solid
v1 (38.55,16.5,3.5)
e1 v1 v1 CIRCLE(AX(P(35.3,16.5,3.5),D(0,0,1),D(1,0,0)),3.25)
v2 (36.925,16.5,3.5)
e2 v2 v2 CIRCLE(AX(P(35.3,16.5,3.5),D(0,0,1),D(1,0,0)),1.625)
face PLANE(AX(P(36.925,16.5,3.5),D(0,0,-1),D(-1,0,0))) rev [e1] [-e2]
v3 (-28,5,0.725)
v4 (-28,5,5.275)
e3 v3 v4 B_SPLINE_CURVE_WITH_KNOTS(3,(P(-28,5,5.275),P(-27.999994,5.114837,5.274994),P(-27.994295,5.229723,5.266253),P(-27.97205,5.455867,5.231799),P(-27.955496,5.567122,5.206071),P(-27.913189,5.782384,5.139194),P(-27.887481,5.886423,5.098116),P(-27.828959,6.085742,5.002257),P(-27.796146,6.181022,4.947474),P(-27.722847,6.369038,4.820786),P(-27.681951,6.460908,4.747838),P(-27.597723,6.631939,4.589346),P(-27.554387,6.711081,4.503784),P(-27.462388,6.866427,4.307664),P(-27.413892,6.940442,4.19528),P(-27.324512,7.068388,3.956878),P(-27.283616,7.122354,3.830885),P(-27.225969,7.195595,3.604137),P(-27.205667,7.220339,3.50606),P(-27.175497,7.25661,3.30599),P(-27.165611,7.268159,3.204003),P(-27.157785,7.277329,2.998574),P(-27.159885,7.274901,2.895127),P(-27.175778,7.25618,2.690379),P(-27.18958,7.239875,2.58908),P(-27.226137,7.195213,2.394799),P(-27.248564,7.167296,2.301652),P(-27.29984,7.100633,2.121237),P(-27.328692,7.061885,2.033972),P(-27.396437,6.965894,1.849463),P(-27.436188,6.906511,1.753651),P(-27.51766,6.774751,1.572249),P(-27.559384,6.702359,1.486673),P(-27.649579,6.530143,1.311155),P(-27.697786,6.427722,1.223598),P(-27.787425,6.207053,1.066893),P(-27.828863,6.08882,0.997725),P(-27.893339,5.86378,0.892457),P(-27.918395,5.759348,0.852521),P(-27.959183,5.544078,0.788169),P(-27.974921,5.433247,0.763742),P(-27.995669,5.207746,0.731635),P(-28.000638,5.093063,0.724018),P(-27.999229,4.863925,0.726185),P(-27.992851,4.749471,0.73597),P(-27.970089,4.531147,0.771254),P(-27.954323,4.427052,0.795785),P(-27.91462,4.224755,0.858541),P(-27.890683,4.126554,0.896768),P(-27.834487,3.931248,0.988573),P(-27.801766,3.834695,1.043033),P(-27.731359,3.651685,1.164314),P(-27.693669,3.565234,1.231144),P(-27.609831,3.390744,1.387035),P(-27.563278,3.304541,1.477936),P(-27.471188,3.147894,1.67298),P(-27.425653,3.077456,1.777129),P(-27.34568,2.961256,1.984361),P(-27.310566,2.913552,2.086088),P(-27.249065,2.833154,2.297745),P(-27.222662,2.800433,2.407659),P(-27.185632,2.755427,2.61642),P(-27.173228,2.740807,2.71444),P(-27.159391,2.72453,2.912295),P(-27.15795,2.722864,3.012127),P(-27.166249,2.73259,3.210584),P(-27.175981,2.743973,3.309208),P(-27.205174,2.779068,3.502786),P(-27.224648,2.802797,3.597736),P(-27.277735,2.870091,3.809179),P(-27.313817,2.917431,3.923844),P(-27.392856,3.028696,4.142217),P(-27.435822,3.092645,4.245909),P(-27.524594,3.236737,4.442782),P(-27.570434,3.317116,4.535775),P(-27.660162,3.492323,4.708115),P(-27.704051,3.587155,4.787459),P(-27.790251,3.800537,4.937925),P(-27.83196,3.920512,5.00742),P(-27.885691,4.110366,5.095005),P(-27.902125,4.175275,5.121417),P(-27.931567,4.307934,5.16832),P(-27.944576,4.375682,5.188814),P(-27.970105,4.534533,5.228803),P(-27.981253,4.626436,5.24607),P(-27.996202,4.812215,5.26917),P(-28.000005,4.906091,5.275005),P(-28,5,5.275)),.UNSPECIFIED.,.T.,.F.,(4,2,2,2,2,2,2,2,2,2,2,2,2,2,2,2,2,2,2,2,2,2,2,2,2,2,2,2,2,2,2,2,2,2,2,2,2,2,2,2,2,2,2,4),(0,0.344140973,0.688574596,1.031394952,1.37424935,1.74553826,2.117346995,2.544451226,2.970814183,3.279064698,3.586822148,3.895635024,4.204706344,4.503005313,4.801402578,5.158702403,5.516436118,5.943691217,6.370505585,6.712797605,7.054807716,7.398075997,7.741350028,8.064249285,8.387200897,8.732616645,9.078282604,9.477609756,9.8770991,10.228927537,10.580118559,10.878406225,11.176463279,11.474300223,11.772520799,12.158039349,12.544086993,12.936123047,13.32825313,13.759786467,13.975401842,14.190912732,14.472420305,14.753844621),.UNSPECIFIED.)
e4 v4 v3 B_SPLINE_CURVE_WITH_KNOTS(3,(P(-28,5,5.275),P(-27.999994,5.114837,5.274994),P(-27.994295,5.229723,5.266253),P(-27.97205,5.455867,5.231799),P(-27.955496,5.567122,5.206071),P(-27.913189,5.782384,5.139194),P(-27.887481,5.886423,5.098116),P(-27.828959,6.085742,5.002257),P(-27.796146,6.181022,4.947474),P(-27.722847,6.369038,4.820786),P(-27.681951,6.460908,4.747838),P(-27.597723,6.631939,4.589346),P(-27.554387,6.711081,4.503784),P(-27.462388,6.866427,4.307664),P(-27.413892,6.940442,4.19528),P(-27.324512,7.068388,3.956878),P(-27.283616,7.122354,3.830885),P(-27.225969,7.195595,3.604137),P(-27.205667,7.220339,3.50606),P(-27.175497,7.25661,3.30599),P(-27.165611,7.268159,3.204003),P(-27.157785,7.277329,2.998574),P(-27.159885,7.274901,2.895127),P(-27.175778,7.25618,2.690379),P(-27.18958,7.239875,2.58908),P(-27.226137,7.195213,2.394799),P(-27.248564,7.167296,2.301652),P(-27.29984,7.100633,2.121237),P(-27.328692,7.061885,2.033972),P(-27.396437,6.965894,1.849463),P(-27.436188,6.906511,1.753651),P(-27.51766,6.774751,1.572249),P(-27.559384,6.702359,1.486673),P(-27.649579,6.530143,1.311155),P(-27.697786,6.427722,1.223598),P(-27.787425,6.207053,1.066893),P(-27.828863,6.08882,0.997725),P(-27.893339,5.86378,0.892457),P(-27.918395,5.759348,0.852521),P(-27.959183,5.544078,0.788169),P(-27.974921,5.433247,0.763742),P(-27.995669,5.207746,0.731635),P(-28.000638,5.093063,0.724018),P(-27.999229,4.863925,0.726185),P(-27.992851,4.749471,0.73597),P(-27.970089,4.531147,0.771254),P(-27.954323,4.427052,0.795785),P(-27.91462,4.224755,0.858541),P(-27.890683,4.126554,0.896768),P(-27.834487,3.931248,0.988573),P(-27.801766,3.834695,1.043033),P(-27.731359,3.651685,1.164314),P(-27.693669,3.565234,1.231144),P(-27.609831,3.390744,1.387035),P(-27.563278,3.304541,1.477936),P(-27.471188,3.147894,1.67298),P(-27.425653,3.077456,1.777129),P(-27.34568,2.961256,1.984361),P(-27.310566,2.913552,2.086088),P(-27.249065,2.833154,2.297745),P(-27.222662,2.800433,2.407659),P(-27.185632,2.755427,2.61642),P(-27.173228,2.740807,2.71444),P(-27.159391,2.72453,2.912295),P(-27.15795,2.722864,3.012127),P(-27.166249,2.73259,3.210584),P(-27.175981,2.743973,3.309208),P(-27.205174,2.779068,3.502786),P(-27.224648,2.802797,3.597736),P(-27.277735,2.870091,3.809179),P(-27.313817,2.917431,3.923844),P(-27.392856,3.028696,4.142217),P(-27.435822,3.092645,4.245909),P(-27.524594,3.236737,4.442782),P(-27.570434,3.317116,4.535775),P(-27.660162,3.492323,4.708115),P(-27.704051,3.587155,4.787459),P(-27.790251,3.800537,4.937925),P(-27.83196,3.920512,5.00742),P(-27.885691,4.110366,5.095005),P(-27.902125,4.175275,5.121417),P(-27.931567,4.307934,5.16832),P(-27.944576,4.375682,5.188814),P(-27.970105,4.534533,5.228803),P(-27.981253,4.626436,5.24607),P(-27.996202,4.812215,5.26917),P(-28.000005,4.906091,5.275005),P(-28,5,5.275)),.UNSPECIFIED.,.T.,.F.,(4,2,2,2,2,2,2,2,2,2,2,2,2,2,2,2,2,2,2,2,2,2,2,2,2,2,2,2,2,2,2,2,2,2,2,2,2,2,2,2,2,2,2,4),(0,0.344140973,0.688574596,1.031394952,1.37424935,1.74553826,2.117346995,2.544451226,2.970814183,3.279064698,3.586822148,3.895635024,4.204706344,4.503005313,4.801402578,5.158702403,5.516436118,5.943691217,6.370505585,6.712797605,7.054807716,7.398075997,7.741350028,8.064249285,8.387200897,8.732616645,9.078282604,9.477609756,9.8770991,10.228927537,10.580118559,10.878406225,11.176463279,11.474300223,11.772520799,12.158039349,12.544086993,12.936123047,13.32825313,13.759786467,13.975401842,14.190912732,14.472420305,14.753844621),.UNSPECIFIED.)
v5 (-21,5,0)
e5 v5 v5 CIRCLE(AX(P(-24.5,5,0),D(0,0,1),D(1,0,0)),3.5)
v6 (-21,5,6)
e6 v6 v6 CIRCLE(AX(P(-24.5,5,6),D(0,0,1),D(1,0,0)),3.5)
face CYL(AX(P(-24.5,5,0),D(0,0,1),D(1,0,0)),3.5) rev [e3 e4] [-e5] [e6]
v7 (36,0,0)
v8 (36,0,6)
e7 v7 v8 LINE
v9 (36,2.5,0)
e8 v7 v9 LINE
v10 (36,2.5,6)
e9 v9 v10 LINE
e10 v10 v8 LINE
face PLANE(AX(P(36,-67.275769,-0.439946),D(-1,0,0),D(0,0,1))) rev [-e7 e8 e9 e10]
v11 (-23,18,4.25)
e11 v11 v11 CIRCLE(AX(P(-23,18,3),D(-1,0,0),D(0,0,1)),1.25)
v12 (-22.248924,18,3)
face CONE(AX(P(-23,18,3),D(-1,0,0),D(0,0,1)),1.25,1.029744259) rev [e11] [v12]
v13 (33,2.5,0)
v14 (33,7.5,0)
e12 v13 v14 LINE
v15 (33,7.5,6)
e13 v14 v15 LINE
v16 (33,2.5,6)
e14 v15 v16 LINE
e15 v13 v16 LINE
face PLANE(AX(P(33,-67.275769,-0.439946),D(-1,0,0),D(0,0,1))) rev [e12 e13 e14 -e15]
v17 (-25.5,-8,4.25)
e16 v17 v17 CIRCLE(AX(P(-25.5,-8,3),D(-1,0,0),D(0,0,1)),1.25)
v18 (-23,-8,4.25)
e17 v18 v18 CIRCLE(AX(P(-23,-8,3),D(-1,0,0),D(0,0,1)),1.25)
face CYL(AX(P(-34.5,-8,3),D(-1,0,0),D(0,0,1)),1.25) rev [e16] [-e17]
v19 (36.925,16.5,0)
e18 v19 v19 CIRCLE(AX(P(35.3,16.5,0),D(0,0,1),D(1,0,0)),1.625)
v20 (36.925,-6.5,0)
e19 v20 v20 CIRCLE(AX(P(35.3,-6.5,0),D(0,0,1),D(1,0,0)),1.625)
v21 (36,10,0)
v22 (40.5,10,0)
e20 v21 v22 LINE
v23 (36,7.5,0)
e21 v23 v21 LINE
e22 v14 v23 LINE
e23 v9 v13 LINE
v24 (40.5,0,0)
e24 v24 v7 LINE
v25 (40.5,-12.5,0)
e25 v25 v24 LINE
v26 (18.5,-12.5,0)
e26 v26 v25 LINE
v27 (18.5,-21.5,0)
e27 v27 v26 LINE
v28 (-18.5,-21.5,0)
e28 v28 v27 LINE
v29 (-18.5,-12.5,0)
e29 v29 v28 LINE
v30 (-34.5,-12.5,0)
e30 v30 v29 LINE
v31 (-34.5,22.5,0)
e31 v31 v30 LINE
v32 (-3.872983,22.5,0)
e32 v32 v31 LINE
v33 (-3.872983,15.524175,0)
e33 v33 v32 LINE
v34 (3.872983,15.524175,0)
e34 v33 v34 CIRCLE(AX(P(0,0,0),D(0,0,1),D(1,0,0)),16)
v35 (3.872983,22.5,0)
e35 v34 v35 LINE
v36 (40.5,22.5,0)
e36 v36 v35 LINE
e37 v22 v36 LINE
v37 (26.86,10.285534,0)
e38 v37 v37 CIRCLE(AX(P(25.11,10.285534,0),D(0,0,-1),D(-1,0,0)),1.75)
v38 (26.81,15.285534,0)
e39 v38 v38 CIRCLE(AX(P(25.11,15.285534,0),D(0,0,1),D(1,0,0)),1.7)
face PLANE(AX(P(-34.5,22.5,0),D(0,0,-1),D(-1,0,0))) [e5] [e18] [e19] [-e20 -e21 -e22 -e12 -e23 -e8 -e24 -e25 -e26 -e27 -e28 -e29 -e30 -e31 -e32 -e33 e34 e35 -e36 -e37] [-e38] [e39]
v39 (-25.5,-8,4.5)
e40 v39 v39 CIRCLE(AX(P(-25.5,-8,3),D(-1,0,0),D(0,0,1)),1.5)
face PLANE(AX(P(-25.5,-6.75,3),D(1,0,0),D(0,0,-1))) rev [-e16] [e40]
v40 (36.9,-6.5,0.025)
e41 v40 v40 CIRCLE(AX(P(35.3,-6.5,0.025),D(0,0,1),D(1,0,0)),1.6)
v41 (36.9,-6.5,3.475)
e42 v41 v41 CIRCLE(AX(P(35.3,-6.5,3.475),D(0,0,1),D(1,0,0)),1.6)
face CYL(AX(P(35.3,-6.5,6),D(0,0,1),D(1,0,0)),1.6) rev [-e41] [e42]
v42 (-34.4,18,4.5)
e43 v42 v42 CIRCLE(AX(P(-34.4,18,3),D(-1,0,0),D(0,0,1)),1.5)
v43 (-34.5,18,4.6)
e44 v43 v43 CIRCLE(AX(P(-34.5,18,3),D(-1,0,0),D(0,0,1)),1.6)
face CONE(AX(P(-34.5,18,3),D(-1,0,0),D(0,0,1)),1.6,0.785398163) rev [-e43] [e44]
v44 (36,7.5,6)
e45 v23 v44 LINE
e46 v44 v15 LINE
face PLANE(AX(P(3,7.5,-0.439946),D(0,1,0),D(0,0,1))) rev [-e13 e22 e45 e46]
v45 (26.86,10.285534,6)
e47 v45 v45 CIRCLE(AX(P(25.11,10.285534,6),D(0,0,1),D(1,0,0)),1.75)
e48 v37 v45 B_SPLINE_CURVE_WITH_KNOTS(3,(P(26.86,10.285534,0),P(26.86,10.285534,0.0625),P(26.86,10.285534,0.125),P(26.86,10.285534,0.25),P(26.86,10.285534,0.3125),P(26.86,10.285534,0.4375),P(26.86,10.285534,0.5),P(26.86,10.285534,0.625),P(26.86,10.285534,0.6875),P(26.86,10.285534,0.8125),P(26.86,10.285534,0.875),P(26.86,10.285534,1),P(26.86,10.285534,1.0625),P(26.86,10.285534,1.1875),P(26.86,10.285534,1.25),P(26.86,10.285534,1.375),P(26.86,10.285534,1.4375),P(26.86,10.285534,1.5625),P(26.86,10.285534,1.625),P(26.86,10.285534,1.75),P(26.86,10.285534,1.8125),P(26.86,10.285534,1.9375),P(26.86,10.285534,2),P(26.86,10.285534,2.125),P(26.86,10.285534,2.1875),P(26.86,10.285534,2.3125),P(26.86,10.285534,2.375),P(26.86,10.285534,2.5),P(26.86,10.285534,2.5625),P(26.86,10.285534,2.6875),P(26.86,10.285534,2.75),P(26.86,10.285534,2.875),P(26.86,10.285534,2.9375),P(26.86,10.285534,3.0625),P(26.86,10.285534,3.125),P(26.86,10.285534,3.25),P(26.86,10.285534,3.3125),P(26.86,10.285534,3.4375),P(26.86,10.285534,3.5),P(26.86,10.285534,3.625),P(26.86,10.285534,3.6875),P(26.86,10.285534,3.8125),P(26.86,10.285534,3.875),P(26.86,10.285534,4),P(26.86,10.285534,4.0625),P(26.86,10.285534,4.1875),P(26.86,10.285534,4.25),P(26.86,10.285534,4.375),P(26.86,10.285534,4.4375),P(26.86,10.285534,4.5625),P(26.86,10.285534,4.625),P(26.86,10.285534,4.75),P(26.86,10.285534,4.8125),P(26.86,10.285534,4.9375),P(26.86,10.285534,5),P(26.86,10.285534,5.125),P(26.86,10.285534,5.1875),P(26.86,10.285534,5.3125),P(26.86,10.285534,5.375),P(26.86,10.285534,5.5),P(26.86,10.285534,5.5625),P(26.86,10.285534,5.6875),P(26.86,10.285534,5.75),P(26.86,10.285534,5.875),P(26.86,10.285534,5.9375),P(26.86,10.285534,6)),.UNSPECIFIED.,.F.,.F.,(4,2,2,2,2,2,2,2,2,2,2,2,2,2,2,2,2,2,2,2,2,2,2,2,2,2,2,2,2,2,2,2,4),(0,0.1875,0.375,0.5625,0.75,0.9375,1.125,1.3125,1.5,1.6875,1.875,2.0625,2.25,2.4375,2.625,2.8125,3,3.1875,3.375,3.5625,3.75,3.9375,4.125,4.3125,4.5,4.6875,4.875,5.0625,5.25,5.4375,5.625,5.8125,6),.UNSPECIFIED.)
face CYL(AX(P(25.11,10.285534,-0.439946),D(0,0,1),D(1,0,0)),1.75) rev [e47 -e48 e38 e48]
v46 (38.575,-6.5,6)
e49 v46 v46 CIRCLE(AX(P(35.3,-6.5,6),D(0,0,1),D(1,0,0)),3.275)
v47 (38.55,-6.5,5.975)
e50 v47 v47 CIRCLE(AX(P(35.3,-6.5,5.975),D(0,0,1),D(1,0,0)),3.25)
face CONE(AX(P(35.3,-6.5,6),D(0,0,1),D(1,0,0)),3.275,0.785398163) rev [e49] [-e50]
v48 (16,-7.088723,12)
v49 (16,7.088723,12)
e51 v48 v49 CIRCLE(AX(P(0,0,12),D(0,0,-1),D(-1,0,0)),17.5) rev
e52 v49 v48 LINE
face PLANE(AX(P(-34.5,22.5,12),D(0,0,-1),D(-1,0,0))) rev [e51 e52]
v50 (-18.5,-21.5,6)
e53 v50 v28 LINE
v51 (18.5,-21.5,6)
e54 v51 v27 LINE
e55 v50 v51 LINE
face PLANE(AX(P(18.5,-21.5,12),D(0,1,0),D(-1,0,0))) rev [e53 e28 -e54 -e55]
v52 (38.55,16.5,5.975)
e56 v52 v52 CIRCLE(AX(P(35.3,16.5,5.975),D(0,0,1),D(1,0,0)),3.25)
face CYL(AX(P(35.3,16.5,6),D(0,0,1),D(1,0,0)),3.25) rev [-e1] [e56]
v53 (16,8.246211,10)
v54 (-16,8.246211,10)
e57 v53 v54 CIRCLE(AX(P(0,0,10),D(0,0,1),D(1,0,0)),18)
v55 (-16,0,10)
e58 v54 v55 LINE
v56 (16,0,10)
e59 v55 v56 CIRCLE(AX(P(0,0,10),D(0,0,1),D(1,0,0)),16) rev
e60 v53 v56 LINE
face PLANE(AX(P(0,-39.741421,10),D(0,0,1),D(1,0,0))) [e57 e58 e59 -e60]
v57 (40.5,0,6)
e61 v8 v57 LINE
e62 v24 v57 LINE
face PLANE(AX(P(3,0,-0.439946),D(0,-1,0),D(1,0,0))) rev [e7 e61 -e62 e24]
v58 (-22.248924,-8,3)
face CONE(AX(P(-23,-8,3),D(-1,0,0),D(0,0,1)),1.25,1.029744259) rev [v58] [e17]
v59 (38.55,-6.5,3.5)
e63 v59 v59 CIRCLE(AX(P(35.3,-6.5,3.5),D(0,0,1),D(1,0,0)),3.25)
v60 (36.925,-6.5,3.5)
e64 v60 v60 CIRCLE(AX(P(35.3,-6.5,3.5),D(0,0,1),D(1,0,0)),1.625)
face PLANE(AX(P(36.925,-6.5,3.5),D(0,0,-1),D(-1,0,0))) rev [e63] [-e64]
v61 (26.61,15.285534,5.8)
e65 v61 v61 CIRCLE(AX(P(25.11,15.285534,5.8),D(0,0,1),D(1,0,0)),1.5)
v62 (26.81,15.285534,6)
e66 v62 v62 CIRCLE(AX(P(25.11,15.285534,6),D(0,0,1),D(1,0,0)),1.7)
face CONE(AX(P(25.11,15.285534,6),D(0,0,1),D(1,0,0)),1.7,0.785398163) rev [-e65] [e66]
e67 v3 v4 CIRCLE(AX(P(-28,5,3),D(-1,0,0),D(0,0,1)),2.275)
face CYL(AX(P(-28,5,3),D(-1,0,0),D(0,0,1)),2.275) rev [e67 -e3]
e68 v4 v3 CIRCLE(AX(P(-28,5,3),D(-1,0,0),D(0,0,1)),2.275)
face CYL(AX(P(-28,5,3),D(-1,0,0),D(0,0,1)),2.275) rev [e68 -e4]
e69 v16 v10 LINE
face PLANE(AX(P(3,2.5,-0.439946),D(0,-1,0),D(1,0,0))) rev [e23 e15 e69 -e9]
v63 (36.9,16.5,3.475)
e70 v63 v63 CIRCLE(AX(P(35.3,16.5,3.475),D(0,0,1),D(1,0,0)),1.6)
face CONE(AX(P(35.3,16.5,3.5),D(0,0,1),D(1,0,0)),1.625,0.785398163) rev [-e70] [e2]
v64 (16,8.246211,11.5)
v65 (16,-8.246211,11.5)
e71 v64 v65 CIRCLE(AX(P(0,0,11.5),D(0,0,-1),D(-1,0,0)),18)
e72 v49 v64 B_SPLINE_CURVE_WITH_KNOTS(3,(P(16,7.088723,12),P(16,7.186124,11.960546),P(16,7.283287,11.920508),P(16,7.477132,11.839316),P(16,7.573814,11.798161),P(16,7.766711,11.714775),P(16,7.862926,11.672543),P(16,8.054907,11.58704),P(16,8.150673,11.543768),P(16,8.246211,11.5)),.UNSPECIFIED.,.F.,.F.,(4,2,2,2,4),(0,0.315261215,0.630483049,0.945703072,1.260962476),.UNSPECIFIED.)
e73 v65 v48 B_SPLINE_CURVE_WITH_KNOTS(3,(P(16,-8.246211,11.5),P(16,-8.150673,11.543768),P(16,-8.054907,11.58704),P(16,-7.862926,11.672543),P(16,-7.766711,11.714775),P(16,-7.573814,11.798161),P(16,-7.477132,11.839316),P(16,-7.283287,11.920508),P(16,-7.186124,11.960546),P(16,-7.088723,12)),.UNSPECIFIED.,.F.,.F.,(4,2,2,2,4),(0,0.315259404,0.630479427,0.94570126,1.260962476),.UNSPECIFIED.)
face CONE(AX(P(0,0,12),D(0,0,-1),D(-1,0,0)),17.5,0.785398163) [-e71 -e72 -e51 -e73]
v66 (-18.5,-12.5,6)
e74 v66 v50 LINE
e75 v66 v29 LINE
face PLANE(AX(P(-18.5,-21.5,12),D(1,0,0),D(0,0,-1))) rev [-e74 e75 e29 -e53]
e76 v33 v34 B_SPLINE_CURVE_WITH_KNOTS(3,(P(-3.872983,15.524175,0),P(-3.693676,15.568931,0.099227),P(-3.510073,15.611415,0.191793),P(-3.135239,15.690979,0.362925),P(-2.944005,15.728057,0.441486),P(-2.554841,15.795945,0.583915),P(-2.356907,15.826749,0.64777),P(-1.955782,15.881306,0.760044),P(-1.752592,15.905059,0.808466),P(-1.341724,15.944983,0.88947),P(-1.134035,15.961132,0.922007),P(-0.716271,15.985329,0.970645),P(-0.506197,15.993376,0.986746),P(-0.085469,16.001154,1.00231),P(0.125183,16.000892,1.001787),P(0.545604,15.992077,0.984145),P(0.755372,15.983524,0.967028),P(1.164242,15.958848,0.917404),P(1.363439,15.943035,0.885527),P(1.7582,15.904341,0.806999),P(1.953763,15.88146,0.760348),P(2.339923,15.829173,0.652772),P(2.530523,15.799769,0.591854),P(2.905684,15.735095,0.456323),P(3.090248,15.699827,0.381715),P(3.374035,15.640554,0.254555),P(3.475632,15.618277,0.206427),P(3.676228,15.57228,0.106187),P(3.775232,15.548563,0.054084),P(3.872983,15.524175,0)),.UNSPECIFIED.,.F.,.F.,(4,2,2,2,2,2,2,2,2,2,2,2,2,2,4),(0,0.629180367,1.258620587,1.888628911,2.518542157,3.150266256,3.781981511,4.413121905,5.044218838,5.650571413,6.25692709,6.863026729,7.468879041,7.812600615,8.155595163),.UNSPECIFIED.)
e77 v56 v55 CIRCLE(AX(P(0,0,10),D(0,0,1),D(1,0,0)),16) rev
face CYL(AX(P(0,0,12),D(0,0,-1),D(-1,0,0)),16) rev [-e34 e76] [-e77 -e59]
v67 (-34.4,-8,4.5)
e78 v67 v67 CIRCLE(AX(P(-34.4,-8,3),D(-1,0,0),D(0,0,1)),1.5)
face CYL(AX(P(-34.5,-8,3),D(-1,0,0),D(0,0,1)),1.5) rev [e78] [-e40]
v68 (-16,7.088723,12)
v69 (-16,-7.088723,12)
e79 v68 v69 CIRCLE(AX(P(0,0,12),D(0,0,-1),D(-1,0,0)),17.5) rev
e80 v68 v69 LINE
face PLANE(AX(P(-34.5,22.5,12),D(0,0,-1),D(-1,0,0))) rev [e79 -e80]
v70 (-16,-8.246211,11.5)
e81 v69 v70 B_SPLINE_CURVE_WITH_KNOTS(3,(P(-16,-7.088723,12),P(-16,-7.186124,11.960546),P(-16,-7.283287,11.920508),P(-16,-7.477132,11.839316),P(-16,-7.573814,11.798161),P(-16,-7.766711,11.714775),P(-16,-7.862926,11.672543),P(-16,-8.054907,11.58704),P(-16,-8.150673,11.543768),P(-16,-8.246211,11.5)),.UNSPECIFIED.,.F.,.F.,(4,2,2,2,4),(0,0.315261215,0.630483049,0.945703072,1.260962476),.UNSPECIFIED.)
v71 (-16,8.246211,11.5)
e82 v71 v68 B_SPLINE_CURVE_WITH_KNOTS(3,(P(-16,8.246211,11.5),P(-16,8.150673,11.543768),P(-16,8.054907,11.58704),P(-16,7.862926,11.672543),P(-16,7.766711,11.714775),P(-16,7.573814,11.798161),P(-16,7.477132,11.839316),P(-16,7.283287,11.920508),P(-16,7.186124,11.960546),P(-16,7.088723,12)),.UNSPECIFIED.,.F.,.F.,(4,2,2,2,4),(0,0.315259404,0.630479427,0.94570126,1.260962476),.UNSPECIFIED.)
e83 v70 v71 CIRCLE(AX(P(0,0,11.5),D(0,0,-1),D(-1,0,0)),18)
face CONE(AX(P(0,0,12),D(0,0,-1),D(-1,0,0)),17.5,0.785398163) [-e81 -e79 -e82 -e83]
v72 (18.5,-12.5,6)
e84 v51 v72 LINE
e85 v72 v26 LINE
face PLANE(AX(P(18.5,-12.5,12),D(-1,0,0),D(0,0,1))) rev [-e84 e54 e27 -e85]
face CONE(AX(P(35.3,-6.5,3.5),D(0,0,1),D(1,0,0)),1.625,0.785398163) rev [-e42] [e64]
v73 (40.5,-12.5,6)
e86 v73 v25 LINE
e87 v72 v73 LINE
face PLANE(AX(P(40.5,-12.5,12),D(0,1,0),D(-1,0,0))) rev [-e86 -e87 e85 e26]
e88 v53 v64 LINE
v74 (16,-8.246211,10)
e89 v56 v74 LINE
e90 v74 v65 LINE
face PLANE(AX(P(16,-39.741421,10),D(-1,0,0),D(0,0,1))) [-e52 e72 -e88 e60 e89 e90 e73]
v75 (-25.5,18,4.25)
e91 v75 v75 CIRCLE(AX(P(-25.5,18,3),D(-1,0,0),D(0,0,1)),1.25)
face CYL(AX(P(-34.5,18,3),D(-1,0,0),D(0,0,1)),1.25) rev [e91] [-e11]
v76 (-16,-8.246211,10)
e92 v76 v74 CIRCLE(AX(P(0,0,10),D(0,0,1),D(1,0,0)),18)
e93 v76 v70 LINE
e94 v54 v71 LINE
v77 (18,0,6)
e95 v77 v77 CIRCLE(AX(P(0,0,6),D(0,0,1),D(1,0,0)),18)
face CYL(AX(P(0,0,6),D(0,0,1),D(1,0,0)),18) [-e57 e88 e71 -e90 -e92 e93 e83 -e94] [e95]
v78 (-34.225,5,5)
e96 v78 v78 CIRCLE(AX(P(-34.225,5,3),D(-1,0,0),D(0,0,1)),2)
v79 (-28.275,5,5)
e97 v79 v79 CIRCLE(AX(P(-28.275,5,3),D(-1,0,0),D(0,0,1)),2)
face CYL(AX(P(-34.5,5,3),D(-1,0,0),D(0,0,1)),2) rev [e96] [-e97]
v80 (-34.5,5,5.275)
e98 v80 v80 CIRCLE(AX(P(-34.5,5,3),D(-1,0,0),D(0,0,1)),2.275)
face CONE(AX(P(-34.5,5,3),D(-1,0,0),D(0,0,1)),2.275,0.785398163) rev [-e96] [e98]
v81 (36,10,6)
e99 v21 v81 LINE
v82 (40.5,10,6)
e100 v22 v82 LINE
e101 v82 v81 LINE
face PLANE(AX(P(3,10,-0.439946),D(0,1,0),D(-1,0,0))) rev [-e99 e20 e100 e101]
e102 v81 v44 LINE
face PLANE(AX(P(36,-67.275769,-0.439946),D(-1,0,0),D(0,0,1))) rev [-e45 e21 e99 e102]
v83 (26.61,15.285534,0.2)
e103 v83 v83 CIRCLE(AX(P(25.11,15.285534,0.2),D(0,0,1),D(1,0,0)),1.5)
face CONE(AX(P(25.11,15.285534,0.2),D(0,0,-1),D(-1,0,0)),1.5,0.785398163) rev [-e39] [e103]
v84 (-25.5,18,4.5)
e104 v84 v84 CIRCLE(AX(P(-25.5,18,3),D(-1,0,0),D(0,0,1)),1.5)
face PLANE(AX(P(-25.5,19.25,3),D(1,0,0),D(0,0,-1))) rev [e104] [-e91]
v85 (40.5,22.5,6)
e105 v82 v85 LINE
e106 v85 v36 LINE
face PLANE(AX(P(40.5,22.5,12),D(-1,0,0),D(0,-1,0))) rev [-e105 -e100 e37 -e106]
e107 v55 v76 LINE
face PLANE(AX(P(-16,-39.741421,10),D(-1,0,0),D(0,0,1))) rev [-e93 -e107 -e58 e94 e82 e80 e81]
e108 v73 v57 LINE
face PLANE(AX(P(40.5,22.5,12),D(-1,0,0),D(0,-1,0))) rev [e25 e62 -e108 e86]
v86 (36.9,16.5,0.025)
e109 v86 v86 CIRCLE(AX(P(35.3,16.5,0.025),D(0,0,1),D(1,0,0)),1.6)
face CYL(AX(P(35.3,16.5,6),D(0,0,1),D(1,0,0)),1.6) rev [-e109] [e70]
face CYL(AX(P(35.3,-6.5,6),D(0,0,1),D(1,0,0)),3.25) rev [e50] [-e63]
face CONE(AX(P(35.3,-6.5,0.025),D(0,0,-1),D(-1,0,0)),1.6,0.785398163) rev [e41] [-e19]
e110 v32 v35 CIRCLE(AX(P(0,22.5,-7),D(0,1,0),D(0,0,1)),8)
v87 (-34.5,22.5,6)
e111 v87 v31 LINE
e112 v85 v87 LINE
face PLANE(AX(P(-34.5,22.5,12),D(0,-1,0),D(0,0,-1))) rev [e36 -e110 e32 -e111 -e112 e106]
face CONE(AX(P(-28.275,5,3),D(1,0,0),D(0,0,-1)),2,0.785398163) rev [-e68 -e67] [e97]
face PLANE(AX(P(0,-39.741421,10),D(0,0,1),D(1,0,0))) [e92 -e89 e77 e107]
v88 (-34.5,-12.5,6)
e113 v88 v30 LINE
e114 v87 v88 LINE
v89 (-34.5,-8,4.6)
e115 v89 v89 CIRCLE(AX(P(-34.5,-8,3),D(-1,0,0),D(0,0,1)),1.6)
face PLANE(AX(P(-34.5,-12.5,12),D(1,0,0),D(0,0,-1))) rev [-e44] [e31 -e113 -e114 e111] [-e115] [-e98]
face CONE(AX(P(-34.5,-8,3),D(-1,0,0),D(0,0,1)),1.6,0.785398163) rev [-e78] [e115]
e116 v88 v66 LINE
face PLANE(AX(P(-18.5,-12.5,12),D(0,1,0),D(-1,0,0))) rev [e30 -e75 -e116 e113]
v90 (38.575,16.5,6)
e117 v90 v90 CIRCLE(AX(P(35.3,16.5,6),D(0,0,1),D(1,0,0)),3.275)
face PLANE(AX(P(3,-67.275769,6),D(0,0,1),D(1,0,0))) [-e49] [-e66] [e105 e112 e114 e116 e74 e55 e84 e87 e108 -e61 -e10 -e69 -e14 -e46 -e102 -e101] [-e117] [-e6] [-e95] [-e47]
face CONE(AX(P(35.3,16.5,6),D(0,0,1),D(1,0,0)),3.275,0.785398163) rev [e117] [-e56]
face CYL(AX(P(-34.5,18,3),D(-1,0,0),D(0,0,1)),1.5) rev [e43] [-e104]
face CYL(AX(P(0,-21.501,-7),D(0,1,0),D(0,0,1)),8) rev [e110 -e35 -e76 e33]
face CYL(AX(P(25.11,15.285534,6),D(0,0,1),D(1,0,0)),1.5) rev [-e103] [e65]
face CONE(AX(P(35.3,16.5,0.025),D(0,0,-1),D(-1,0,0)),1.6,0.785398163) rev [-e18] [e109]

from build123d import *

# Parameters (mm, degrees)
SKETCH_1_R                  = 16
EXTRUDE_1_DEPTH             = 12
SKETCH_3_R                  = 18
CUT_EXTRUDE_2_DEPTH         = 6
CUT_EXTRUDE_5_DEPTH         = 2
CUT_EXTRUDE_6_REACH         = 62.994
CUT_EXTRUDE_6_END_RADIUS    = 16
HOLE_WIZARD_M3_AT_2_COUNT   = 2
HOLE_WIZARD_M3_AT_2_PITCH   = 23
HOLE_WIZARD_M3_1_AT_2_COUNT = 2
HOLE_WIZARD_M3_1_AT_2_PITCH = 26
SKETCH_11_R                 = 3.5
CUT_EXTRUDE_8_DEPTH         = 47.717234568
SKETCH_12_W                 = 3
SKETCH_12_H                 = 5
CUT_EXTRUDE_9_DEPTH         = 47.717234568
SKETCH_15_R                 = 1.75
CUT_EXTRUDE_10_DEPTH        = 47.717234568
CHAMFER_1_SIZE              = 0.5


# Read off the part's stored shape, not the designer's step: M4
with BuildPart() as part:
    # Эскиз1 → Бобышка-Вытянуть1 (new body)
    with BuildSketch(Plane.XY):
        Polygon((-34.5, 22.5), (12.5, 22.5), (40.5, 22.5), (40.5, -12.5), (18.5, -12.5), (18.5, -21.5), (-18.5, -21.5), (-18.5, -12.5), (-34.5, -12.5), align=None)
        Circle(SKETCH_1_R, mode=Mode.SUBTRACT)
    extrude(amount=EXTRUDE_1_DEPTH)

    # Эскиз3 → Вырез-Вытянуть2 (cut)
    with BuildSketch(Plane.XY.offset(12)):
        Polygon((18.5, -21.5), (18.5, -12.5), (40.5, -12.5), (40.5, 22.5), (-34.5, 22.5), (-34.5, -12.5), (-18.5, -12.5), (-18.5, -21.5), align=None)
        Circle(SKETCH_3_R, mode=Mode.SUBTRACT)
    extrude(amount=-CUT_EXTRUDE_2_DEPTH, mode=Mode.SUBTRACT)

    # Эскиз4 → Вырез-Вытянуть5 (cut)
    with BuildSketch(Plane.XY.offset(12)):
        with BuildLine():
            ThreePointArc((16, 8.246211251), (0, 18), (-16, 8.246211251))
            Line((-16, 8.246211251), (-16, 8.8e-08))
            ThreePointArc((-16, 8.8e-08), (4.4e-08, 16), (16, 0))
            Line((16, 0), (16, 8.246211251))
        make_face()
        with BuildLine():
            ThreePointArc((16, 0), (-4.4e-08, -16), (-16, 8.8e-08))
            Line((-16, 8.8e-08), (-16, -8.246211251))
            ThreePointArc((-16, -8.246211251), (0, -18), (16, -8.246211251))
            Line((16, -8.246211251), (16, 0))
        make_face()
    extrude(amount=-CUT_EXTRUDE_5_DEPTH, mode=Mode.SUBTRACT)

    # Вырез-Вытянуть6: up to this cylinder (the profile starts outside it)
    cut_extrude_6_end = Plane(origin=(0, 0, 0.402223), z_dir=(0, 0, -1)) * Cylinder(CUT_EXTRUDE_6_END_RADIUS, 158.988, mode=Mode.PRIVATE)
    # Эскиз5 → Вырез-Вытянуть6 (cut, up to the surface)
    with BuildSketch(Plane(origin=(0, 22.5, 0), x_dir=(1, 0, 0), z_dir=(0, 1, 0)), mode=Mode.PRIVATE) as cut_extrude_6_sk1:
        with BuildLine():
            Line((-3.872983346, 0), (3.872983346, 0))
            ThreePointArc((3.872983346, 0), (0, -1), (-3.872983346, 0))
        make_face()
    cut_extrude_6_tool1 = extrude(cut_extrude_6_sk1.sketch, amount=-CUT_EXTRUDE_6_REACH, mode=Mode.PRIVATE) - cut_extrude_6_end
    add(cut_extrude_6_tool1.solids().sort_by_distance((0, 22.5, 0.402223))[0], mode=Mode.SUBTRACT)

    # Эскиз7 → Цековка для  M3 (revolve, cut)
    with BuildSketch(Plane(origin=(35.3, 16.5, 6), x_dir=(0, -1, 0), z_dir=(1, 0, 0))):
        Polygon((0, 0), (0, 6), (1.625, 6), (1.6, 5.975), (1.6, 2.525), (1.625, 2.5), (3.25, 2.5), (3.25, 0.025), (3.275, 0), align=None)
    hole_wizard_m3 = revolve(axis=Axis((35.3, 16.5, 12.35), (0, 0, -1)), mode=Mode.SUBTRACT)

    # Цековка для  M3 at 2: Цековка для  M3 ×2
    with Locations(*[(0, -i * HOLE_WIZARD_M3_AT_2_PITCH, 0) for i in range(1, HOLE_WIZARD_M3_AT_2_COUNT)]):
        add(hole_wizard_m3, mode=Mode.SUBTRACT)

    # Эскиз9 → M3_1 (revolve, cut)
    with BuildSketch(Plane(origin=(-34.5, -8, 3), x_dir=(0, 0, 1), z_dir=(0, 1, 0))):
        Polygon((0, 0), (0, 12.251075774), (1.25, 11.5), (1.25, 9), (1.5, 9), (1.5, 0.1), (1.6, 0), align=None)
    hole_wizard_m3_1 = revolve(axis=Axis((-40.85, -8, 3), (1, 0, 0)), mode=Mode.SUBTRACT)

    # M3_1 at 2: M3_1 ×2
    with Locations(*[(0, i * HOLE_WIZARD_M3_1_AT_2_PITCH, 0) for i in range(1, HOLE_WIZARD_M3_1_AT_2_COUNT)]):
        add(hole_wizard_m3_1, mode=Mode.SUBTRACT)

    # Эскиз11 → Вырез-Вытянуть8 (cut, through all)
    with BuildSketch(Plane.XY.offset(6)):
        with Locations((-24.5, 5)):
            Circle(SKETCH_11_R)
    extrude(amount=-CUT_EXTRUDE_8_DEPTH, mode=Mode.SUBTRACT)

    # Эскиз12 → Вырез-Вытянуть9 (cut, through all)
    with BuildSketch(Plane.XY.offset(6)):
        Polygon((40.5, 0), (40.5, 10), (36, 10), (36, 7.5), (36, 2.5), (36, 0), align=None)
        with Locations((34.5, 5)):
            Rectangle(SKETCH_12_W, SKETCH_12_H)
    extrude(amount=-CUT_EXTRUDE_9_DEPTH, mode=Mode.SUBTRACT)

    # M4 outline → M4 (revolve, cut)
    with BuildSketch(Plane(origin=(0, 5, 3), x_dir=(0, 1, 0), z_dir=(0, 0, -1))):
        Polygon((2.275, -28), (2.275, -27.159503456), (0, -27.159503456), (0, -34.5), (2.275, -34.5), (2, -34.225), (2, -28.275), align=None)
    revolve(axis=Axis((0, 5, 3), (1, 0, 0)), mode=Mode.SUBTRACT)

    # Эскиз15 → Вырез-Вытянуть10 (cut, through all)
    with BuildSketch(Plane.XY.offset(6)):
        with Locations((25.11, 10.285533906)):
            Circle(SKETCH_15_R)
    extrude(amount=-CUT_EXTRUDE_10_DEPTH, mode=Mode.SUBTRACT)

    # Эскиз16 → M3_2 (revolve, cut)
    with BuildSketch(Plane(origin=(25.11, 15.285533906, 6), x_dir=(0, -1, 0), z_dir=(1, 0, 0))):
        Polygon((0, 0), (0, 6), (1.7, 6), (1.5, 5.8), (1.5, 0.2), (1.7, 0), align=None)
    revolve(axis=Axis((25.11, 15.285533906, 12.35), (0, 0, -1)), mode=Mode.SUBTRACT)

    # Фаска1
    chamfer_1_edges = [part.edges().sort_by_distance(p)[0] for p in [
        (-18, 0, 12),
        (17.492855685, -4.242640687, 12),
    ]]
    chamfer(chamfer_1_edges, length=CHAMFER_1_SIZE)


solid = part.part
